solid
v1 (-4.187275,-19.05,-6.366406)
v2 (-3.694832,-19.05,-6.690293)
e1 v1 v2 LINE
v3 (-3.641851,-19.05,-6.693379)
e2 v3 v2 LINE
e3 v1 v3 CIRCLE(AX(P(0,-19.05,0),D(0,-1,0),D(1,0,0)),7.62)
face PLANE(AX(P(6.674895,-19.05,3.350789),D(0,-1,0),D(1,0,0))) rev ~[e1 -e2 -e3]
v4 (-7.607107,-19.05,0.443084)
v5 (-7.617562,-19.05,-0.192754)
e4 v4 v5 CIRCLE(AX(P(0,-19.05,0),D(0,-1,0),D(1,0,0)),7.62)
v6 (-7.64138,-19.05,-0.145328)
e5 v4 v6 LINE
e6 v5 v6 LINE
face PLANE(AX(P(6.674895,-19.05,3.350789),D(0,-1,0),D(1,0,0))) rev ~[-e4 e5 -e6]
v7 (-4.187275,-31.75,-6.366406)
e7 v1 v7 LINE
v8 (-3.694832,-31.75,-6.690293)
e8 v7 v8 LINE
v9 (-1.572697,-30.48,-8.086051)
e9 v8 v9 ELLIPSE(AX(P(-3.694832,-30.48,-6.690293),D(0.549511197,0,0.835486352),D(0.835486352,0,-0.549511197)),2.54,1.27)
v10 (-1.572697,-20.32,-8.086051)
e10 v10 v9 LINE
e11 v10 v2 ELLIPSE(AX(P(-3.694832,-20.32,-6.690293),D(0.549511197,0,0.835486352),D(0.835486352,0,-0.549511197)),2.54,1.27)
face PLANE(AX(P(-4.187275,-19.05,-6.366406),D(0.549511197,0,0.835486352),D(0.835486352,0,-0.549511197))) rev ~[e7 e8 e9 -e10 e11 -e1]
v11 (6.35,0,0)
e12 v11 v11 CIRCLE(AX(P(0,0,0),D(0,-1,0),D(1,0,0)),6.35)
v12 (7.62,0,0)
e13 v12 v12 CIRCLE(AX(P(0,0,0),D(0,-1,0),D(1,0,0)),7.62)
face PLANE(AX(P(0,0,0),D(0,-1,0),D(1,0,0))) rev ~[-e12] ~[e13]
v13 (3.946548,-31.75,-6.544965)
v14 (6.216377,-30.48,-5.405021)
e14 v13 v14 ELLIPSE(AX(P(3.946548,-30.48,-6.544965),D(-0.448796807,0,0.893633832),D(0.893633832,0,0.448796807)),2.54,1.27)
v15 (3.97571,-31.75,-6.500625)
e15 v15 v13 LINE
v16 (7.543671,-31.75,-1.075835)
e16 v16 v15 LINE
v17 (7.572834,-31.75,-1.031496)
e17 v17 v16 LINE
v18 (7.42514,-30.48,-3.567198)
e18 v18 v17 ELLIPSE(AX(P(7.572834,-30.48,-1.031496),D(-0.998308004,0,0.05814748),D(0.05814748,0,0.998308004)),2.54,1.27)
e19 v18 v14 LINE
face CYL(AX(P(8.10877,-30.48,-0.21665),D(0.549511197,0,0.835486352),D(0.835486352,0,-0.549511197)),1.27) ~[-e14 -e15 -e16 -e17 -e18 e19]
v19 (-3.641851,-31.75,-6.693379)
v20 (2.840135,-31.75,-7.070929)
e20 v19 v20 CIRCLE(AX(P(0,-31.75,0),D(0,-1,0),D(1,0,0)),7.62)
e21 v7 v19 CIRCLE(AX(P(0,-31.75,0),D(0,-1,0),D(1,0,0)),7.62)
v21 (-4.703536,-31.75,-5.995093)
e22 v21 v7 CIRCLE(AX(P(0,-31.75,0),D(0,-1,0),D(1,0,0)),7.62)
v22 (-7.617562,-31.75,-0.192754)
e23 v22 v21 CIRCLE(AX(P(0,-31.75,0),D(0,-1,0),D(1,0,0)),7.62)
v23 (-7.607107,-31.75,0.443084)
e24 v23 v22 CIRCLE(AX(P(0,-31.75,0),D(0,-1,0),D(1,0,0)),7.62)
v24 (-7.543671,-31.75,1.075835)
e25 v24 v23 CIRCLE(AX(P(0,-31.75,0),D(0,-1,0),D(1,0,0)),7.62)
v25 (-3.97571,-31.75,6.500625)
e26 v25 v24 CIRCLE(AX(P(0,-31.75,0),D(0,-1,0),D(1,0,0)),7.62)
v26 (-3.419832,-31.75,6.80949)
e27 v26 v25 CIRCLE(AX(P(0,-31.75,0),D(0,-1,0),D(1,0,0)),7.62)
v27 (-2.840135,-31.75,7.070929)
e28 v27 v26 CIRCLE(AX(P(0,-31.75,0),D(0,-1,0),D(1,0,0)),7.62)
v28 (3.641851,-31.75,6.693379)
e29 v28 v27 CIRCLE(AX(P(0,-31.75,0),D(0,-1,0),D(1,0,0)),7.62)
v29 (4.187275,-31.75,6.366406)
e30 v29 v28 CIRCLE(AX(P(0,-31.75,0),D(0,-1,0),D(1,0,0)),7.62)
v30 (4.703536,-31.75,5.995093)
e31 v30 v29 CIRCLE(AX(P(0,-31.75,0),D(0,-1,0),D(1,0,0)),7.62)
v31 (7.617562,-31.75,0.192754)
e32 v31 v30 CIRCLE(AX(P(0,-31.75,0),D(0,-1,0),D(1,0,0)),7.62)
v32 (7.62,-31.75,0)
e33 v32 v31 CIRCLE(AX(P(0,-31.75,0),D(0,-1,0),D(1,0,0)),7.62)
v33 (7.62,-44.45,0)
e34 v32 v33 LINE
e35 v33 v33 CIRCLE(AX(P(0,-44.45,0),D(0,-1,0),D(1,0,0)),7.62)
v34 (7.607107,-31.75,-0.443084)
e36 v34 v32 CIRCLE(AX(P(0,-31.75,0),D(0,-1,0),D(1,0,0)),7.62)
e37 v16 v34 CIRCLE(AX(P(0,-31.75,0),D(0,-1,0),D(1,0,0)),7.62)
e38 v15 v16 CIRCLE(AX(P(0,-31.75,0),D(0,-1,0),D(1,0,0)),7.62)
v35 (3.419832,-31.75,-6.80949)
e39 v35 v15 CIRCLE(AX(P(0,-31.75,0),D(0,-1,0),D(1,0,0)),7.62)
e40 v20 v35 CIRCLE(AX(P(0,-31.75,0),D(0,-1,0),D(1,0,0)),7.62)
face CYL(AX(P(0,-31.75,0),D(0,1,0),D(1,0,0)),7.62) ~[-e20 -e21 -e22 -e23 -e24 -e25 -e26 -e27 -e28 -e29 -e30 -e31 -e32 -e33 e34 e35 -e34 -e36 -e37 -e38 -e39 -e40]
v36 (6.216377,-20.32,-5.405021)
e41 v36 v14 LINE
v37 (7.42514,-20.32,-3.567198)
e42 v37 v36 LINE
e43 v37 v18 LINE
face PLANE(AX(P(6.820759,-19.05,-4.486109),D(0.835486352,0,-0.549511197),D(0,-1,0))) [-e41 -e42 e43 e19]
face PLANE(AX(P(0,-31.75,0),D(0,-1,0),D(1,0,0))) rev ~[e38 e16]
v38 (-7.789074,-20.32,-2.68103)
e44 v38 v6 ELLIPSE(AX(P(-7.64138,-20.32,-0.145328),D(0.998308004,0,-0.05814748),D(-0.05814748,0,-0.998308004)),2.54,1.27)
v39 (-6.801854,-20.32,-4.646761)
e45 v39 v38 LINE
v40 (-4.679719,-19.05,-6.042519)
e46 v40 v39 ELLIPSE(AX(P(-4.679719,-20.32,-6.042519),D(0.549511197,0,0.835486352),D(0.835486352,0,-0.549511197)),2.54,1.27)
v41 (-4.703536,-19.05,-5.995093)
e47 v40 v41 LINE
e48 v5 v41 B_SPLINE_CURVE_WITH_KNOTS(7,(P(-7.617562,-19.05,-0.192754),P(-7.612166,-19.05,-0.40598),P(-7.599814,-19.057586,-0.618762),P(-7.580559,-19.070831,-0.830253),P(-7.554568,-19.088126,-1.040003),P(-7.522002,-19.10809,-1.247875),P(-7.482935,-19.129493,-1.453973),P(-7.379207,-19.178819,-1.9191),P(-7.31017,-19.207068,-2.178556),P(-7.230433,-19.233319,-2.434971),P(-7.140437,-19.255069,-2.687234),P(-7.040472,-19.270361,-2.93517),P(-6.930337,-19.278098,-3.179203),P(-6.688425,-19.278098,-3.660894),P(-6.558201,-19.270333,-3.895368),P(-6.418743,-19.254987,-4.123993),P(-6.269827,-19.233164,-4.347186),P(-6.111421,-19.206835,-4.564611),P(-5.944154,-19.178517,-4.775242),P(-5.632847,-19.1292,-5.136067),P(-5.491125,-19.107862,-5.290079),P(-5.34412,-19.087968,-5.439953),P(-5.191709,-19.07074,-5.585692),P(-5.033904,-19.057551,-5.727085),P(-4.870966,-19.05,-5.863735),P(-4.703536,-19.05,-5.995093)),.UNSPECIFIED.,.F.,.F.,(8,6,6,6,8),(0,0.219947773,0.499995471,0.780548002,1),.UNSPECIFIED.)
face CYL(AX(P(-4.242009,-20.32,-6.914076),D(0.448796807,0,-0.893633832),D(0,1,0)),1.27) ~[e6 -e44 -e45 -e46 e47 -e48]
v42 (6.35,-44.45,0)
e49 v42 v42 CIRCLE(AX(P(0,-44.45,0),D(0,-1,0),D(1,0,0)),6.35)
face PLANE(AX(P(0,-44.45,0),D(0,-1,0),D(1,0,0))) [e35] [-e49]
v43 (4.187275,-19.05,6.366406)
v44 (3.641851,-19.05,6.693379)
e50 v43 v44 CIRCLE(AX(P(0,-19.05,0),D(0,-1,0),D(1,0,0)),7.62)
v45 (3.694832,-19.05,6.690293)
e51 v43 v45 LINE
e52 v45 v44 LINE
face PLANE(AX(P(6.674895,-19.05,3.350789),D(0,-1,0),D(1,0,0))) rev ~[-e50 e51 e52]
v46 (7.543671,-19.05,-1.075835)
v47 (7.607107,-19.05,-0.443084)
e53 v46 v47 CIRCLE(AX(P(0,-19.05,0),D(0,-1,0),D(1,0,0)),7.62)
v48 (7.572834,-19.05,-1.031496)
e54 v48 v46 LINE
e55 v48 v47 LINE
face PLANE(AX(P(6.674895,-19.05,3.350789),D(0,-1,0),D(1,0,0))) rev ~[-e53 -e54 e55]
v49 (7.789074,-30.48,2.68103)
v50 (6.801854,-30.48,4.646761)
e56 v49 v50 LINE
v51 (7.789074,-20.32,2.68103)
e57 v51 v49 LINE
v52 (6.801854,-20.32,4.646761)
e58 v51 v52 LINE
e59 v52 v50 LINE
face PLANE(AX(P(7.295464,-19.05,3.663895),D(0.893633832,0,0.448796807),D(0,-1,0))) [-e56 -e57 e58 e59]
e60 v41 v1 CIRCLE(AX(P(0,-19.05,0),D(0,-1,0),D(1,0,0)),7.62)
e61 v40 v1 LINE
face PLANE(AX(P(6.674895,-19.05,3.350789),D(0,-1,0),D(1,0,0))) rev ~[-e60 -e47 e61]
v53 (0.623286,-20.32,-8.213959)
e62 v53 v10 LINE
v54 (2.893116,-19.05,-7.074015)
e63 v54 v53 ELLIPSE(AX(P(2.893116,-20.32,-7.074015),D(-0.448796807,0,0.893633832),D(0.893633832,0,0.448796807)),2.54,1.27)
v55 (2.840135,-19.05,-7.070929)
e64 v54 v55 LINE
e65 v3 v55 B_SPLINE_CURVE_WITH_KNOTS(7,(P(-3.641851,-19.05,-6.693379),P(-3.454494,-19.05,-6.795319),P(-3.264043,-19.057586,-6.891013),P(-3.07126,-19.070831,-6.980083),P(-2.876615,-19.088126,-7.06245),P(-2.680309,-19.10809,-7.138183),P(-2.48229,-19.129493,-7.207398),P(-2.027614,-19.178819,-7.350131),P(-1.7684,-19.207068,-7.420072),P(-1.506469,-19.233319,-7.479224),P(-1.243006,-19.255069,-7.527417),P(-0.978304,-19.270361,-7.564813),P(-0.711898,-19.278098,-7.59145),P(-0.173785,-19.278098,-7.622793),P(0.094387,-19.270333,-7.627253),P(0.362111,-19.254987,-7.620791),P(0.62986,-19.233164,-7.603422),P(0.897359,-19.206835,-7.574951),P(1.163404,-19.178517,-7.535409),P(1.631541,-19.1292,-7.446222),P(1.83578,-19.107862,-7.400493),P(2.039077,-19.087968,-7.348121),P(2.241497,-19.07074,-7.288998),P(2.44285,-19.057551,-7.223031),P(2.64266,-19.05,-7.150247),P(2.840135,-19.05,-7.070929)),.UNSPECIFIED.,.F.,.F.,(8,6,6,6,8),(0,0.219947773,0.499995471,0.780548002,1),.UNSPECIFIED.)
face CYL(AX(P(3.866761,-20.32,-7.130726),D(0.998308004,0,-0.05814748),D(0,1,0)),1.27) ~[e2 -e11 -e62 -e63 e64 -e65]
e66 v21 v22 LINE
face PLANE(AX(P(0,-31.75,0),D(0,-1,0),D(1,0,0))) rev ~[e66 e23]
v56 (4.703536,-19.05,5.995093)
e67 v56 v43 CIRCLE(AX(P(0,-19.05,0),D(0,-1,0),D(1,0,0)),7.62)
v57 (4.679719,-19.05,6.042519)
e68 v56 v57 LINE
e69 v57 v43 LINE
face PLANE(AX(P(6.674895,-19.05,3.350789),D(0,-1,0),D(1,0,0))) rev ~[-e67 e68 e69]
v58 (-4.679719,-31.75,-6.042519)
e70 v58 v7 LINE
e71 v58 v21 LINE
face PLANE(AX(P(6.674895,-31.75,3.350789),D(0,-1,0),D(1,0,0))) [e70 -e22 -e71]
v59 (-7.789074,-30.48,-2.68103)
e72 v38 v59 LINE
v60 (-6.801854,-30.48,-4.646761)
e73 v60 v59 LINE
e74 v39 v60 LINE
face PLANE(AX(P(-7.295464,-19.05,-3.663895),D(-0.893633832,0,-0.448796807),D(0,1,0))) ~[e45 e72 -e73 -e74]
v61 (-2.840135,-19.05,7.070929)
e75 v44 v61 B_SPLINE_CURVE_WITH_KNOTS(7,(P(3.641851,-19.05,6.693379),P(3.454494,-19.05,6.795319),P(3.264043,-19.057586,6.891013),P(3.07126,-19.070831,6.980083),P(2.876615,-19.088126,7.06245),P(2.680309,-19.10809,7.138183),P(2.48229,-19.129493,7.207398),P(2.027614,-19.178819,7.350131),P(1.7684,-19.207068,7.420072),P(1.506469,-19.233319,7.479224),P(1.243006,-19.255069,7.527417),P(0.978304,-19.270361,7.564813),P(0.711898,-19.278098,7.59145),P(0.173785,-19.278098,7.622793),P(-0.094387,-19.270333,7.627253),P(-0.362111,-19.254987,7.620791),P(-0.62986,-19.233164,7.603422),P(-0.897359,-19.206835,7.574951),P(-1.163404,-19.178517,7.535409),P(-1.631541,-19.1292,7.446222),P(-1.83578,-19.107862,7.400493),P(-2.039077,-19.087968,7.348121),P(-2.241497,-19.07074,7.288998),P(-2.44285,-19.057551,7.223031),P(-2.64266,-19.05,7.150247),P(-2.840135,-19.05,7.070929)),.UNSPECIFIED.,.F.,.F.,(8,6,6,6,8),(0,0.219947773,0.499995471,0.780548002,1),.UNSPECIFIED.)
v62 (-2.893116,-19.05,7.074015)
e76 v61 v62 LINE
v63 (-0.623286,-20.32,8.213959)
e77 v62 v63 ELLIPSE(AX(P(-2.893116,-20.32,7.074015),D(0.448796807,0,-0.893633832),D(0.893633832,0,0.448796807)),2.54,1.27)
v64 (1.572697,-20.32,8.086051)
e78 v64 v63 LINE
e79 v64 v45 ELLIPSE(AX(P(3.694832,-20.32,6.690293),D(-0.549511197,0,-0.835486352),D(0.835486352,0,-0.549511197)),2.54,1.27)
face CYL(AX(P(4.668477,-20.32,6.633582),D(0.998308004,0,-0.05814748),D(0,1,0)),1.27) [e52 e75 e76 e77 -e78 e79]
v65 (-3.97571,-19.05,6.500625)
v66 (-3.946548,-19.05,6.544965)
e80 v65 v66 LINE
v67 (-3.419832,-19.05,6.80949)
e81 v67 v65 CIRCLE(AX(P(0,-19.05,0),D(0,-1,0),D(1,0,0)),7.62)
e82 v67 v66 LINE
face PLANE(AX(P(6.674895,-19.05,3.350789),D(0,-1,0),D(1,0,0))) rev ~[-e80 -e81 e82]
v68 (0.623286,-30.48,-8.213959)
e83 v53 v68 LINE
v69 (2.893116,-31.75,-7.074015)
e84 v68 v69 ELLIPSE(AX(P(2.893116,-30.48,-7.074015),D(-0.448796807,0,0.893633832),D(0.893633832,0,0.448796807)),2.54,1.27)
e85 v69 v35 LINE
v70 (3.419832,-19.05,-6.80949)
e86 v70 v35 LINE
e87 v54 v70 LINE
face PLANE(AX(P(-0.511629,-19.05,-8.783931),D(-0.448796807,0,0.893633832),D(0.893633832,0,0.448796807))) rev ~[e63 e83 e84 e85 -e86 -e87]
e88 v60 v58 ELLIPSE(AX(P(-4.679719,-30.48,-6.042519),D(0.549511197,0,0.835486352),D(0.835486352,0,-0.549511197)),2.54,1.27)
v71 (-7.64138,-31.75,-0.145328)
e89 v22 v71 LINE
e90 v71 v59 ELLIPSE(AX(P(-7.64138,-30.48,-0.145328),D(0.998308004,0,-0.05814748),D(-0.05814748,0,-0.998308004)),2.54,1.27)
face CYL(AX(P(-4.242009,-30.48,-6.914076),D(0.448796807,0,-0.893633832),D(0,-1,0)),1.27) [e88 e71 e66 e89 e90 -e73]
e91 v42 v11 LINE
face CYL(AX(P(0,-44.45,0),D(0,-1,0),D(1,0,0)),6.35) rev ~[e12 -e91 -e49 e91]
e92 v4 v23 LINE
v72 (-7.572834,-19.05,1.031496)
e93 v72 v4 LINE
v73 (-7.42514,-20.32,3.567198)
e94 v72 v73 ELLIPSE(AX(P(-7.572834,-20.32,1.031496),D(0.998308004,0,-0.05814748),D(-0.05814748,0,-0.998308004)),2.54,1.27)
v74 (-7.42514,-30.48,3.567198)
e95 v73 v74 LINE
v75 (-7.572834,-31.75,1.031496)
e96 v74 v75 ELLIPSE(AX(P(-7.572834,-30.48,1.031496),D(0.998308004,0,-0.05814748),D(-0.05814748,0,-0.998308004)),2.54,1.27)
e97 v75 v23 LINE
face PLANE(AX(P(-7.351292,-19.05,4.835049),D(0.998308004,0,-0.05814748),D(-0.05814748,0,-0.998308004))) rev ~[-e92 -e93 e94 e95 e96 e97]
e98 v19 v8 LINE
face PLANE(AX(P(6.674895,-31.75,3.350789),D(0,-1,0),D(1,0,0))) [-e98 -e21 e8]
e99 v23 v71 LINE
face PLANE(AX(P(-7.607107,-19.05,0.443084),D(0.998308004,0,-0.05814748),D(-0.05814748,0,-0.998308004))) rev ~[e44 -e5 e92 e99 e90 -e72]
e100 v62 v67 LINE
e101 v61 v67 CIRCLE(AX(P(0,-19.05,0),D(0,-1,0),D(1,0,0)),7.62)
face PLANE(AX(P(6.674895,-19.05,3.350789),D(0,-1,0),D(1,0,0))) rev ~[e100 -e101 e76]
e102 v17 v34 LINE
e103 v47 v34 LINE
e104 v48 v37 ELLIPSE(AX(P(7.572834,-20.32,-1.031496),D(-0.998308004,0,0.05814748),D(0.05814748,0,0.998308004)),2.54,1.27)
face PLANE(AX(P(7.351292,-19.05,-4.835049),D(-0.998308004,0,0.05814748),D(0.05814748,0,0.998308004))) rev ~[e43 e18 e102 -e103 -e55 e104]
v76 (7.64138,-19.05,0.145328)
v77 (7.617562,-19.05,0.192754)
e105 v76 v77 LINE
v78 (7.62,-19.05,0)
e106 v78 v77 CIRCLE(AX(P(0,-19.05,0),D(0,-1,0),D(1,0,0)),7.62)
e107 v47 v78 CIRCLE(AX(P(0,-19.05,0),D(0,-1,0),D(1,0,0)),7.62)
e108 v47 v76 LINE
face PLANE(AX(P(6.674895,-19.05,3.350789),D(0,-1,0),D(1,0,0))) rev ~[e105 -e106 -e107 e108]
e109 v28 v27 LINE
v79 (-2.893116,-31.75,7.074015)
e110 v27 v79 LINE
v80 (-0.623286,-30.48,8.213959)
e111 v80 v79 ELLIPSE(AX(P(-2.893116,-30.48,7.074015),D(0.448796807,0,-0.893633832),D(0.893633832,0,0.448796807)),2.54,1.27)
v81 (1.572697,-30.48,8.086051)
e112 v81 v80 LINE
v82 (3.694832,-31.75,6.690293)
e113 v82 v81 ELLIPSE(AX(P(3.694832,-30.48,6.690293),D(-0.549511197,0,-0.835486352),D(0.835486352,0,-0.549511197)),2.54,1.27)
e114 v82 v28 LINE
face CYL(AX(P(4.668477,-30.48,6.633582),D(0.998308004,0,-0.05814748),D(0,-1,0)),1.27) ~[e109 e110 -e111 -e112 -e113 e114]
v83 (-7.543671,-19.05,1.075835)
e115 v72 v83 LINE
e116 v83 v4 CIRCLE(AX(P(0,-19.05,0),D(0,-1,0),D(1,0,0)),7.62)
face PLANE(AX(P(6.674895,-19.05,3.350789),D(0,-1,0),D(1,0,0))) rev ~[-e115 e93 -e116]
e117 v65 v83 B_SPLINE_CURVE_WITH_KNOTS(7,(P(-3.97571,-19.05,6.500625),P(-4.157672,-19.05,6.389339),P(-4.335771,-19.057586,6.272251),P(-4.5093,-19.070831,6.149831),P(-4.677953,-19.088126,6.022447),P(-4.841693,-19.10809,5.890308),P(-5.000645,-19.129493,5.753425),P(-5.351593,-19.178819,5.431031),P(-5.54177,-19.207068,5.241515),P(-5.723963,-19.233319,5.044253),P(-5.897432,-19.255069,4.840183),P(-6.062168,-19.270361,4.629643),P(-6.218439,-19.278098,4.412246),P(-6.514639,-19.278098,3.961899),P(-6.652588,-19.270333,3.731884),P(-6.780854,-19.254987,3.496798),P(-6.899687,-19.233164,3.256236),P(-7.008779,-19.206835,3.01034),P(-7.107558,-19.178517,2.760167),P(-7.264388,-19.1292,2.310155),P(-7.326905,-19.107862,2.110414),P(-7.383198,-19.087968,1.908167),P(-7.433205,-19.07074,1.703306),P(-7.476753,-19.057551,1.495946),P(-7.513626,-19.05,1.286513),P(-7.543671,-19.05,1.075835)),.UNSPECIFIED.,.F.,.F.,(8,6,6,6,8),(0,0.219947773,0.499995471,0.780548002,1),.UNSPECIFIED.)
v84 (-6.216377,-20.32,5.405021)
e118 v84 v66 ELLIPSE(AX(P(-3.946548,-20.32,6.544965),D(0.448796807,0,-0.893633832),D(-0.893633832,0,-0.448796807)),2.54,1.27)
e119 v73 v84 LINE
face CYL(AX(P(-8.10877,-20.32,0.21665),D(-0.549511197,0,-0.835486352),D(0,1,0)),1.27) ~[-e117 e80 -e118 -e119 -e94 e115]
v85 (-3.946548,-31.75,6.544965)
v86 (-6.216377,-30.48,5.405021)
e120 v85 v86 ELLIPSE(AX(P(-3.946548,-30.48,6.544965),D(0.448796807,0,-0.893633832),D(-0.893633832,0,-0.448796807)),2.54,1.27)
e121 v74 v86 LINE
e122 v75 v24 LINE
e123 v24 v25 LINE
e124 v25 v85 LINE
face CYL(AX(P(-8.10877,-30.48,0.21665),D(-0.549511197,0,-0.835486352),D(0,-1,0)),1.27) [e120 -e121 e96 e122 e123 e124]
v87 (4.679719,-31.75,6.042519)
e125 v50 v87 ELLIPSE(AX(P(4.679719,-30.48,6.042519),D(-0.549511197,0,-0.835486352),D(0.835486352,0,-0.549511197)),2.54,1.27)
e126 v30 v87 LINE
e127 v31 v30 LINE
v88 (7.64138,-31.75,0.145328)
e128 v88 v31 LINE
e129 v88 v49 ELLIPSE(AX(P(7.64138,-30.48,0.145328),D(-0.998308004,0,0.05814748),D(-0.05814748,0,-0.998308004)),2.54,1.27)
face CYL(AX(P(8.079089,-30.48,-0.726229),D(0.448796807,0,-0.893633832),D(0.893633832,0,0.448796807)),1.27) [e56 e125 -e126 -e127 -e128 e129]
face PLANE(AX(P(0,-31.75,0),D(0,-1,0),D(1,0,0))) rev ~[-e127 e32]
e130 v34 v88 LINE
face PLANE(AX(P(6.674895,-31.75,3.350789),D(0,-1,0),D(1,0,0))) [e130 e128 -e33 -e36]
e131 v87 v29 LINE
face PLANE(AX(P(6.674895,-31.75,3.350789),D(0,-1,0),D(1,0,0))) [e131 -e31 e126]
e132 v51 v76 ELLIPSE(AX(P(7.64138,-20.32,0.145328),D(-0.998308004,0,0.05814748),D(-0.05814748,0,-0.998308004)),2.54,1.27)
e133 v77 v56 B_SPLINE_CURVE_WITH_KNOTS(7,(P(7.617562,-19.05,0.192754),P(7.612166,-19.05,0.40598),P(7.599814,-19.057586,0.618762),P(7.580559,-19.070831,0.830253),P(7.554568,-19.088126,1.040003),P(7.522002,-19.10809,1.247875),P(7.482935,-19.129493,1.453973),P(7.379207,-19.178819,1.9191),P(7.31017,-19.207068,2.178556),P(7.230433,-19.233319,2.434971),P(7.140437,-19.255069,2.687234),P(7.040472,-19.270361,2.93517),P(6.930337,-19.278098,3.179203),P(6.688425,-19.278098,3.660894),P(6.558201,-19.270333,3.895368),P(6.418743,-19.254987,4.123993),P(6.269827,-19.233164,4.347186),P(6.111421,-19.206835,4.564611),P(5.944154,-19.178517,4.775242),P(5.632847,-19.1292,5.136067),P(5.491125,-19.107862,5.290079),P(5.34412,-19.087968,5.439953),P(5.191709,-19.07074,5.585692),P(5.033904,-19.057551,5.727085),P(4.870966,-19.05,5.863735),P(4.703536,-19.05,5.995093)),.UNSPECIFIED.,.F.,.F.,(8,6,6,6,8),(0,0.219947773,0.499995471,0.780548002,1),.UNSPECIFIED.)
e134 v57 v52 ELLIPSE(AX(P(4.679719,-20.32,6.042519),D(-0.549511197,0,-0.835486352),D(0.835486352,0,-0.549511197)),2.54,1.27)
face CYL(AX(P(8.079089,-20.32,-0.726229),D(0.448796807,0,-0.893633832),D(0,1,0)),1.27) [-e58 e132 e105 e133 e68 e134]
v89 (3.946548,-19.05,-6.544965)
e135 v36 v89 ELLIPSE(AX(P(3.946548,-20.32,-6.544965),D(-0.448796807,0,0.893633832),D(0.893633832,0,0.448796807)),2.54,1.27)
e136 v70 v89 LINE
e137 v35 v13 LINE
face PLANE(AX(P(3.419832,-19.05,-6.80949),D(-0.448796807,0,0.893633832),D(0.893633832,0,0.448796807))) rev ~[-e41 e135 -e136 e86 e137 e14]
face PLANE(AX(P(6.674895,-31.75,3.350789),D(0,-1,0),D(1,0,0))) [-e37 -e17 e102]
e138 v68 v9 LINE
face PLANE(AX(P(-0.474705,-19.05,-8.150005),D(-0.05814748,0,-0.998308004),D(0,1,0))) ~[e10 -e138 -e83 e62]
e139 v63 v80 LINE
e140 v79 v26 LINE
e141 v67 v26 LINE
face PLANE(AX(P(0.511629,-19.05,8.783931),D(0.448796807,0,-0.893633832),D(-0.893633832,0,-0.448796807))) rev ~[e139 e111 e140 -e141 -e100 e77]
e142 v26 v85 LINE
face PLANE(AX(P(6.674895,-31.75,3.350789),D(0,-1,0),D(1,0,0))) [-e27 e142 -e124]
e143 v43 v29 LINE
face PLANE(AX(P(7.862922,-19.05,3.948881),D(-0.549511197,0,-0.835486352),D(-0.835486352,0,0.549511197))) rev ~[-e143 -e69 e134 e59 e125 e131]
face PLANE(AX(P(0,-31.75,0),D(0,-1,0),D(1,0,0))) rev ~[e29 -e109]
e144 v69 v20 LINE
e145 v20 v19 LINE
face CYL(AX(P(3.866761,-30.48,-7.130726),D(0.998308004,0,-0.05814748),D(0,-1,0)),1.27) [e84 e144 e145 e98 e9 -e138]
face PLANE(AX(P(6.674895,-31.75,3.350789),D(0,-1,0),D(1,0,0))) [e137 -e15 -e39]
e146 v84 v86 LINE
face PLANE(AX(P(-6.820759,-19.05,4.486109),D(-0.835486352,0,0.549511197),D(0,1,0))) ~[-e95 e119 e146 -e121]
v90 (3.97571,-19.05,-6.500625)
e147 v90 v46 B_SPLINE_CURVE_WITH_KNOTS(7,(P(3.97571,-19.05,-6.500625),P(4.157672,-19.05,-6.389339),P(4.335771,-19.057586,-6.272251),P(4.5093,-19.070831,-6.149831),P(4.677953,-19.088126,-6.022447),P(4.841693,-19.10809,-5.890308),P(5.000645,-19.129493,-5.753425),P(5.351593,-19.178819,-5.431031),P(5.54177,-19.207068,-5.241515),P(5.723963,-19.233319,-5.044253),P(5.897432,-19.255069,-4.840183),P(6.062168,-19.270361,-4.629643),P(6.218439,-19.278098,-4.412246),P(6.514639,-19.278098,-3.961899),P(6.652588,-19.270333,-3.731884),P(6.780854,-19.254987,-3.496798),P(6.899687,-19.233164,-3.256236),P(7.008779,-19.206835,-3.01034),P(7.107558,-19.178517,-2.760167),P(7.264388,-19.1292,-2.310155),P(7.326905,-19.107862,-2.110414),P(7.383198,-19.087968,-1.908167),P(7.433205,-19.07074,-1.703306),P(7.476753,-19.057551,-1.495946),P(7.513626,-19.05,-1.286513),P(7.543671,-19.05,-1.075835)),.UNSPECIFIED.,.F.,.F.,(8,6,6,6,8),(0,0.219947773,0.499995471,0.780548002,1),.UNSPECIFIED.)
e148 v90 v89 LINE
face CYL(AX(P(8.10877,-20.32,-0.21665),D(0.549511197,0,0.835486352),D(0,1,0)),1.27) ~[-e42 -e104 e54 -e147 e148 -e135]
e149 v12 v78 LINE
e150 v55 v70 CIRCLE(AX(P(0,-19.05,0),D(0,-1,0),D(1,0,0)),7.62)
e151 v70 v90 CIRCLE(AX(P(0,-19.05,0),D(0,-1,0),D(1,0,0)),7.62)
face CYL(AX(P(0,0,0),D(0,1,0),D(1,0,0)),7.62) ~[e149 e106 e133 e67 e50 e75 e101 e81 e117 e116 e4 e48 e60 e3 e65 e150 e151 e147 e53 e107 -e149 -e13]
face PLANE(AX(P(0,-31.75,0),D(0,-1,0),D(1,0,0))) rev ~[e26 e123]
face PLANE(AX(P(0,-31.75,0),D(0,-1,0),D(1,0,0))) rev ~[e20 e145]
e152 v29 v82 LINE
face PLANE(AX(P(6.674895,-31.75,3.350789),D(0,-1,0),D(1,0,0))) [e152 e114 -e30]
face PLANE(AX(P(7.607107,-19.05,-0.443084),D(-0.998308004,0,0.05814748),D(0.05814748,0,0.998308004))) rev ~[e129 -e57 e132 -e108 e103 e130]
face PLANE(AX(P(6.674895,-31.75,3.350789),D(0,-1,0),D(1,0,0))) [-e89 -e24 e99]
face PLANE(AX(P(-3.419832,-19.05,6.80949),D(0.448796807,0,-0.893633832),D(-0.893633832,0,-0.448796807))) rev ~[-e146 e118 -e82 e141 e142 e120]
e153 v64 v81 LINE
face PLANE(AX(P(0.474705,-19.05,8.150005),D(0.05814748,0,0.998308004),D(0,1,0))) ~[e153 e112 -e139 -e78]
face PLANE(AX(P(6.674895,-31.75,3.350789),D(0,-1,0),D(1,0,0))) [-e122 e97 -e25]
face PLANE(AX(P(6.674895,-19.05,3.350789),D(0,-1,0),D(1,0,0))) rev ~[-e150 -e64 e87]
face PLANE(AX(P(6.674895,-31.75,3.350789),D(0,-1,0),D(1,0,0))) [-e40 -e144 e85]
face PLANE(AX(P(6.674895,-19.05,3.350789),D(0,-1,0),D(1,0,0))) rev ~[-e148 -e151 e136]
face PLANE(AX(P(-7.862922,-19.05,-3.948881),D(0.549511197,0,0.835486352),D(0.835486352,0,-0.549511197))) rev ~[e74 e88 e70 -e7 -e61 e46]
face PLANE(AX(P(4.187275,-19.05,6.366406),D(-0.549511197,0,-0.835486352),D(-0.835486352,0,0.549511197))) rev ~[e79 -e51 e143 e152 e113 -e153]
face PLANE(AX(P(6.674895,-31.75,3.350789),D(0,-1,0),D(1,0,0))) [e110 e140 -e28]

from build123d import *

# Parameters (mm, degrees)
F0_R         = 7.62
F1_DEPTH     = 19.05
F3_DEPTH     = 12.7
F4_SIZE      = 1.27
F5_T1_DEPTH  = 8.5497045256
F5_T3_DEPTH  = 8.5497045256
F5_T5_DEPTH  = 8.5497045256
F5_T7_DEPTH  = 8.5497045256
F5_T12_DEPTH = 8.5497045256
F5_S13_R     = 7.62
F5_T14_DEPTH = 6
F5_T18_DEPTH = 8.5497045256
F5_S19_R     = 7.62
F5_T20_DEPTH = 6
F5_T24_DEPTH = 8.5497045256
F5_S25_R     = 7.62
F5_T26_DEPTH = 6
F5_T30_DEPTH = 8.5497045256
F5_S31_R     = 7.62
F5_T32_DEPTH = 6
F5_T36_DEPTH = 8.5497045256
F5_S37_R     = 7.62
F5_T38_DEPTH = 6
F5_T42_DEPTH = 8.5497045256
F5_S43_R     = 7.62
F5_T44_DEPTH = 6
F6_R         = 7.62
F7_DEPTH     = 12.7
F8_R         = 6.35
F9_DEPTH     = 44.4510001


# Not quite as in the source:
# - a fillet or chamfer that OpenCascade refuses, or shapes differently, is made with other operations: its cross-section is extruded or revolved along the edge and cut away or added


with BuildPart() as f1:
    # F0 (on Front) → F1 (new body)
    with BuildSketch(Plane.XZ):
        Circle(F0_R)
    extrude(amount=F1_DEPTH)

    # F2 (on face) → F3 (join)
    with BuildSketch(Plane.XZ.offset(19.05)):
        with BuildLine():
            Line((7.8629215405, 3.9488814679), (4.1872753391, 6.3664059904))
            ThreePointArc((4.1872753391, 6.3664059904), (6.7071394083, 3.6164459015), (7.62, 0))
            ThreePointArc((7.62, 0), (7.616776064, -0.2216357159), (7.6071069841, -0.4430838887))
            Line((7.6071069841, -0.4430838887), (7.8629215405, 3.9488814679))
        make_face()
        with BuildLine():
            ThreePointArc((4.1872753391, 6.3664059904), (0.4430838236, 7.6071069879), (-3.4198316443, 6.8094898138))
            ThreePointArc((-3.4198316443, 6.8094898138), (-6.3664059346, 4.187275424), (-7.6071069765, 0.4430840189))
            ThreePointArc((-7.6071069765, 0.4430840189), (-6.8094898664, -3.4198315396), (-4.187275378, -6.3664059648))
            ThreePointArc((-4.187275378, -6.3664059648), (-0.4430838337, -7.6071069873), (3.419831668, -6.8094898019))
            ThreePointArc((3.419831668, -6.8094898019), (6.3664059777, -4.1872753585), (7.6071069841, -0.4430838887))
            ThreePointArc((7.6071069841, -0.4430838887), (7.616776064, -0.2216357159), (7.62, 0))
            ThreePointArc((7.62, 0), (6.7071394083, 3.6164459015), (4.1872753391, 6.3664059904))
        make_face()
        with BuildLine():
            ThreePointArc((7.6071069841, -0.4430838887), (6.3664059777, -4.1872753585), (3.419831668, -6.8094898019))
            Line((3.419831668, -6.8094898019), (7.351292438, -4.8350490681))
            Line((7.351292438, -4.8350490681), (7.6071069841, -0.4430838887))
        make_face()
        with BuildLine():
            ThreePointArc((3.419831668, -6.8094898019), (-0.4430838337, -7.6071069873), (-4.187275378, -6.3664059648))
            Line((-4.187275378, -6.3664059648), (-0.5116291025, -8.783930536))
            Line((-0.5116291025, -8.783930536), (3.419831668, -6.8094898019))
        make_face()
        with BuildLine():
            ThreePointArc((-4.187275378, -6.3664059648), (-6.8094898664, -3.4198315396), (-7.6071069765, 0.4430840189))
            Line((-7.6071069765, 0.4430840189), (-7.8629215405, -3.9488814679))
            Line((-7.8629215405, -3.9488814679), (-4.187275378, -6.3664059648))
        make_face()
        with BuildLine():
            Line((-3.4198316443, 6.8094898138), (-7.351292438, 4.8350490681))
            Line((-7.351292438, 4.8350490681), (-7.6071069765, 0.4430840189))
            ThreePointArc((-7.6071069765, 0.4430840189), (-6.3664059346, 4.187275424), (-3.4198316443, 6.8094898138))
        make_face()
        with BuildLine():
            Line((0.5116291025, 8.783930536), (-3.4198316443, 6.8094898138))
            ThreePointArc((-3.4198316443, 6.8094898138), (0.4430838236, 7.6071069879), (4.1872753391, 6.3664059904))
            Line((4.1872753391, 6.3664059904), (0.5116291025, 8.783930536))
        make_face()
    extrude(amount=F3_DEPTH)

    # F4
    f4_edges = [f1.edges().sort_by_distance(p)[0] for p in [
        (7.862922, -25.4, 3.948881),
        (7.351292, -25.4, -4.835049),
        (-0.511629, -25.4, -8.783931),
        (-7.862922, -25.4, -3.948881),
        (-7.351292, -25.4, 4.835049),
        (0.511629, -25.4, 8.783931),
    ]]
    chamfer(f4_edges, length=F4_SIZE)

    # F5: fillet of radius 1.27 on 12 edges, made by hand

    # F5_s2 → F5_t1 (cut)
    with BuildSketch(Plane(origin=(1.918540045, 0, -3.8201526101), x_dir=(0, 1, 0), z_dir=(-0.4487968068, 0, 0.8936338323))):
        with BuildLine():
            ThreePointArc((-30.48, -8.1638181024), (-31.3780256121, -7.7918437146), (-31.75, -6.8938181024))
            Line((-31.75, -6.8938181024), (-31.75, -8.1638181024))
            Line((-31.75, -8.1638181024), (-30.48, -8.1638181024))
        make_face()
        with BuildLine():
            ThreePointArc((-31.75, 6.8938181024), (-31.3780256121, 7.7918437146), (-30.48, 8.1638181024))
            Line((-30.48, 8.1638181024), (-31.75, 8.1638181024))
            Line((-31.75, 8.1638181024), (-31.75, 6.8938181024))
        make_face()
    extrude(amount=F5_T1_DEPTH, mode=Mode.SUBTRACT)

    # F5_s4 → F5_t3 (cut)
    with BuildSketch(Plane(origin=(4.2676192292, 0, -0.2485718879), x_dir=(0, 1, 0), z_dir=(-0.9983080038, 0, 0.0581474803))):
        with BuildLine():
            ThreePointArc((-31.75, -6.8938181024), (-31.3780256121, -7.7918437146), (-30.48, -8.1638181024))
            Line((-30.48, -8.1638181024), (-31.75, -8.1638181024))
            Line((-31.75, -8.1638181024), (-31.75, -6.8938181024))
        make_face()
        with BuildLine():
            ThreePointArc((-31.75, 6.8938181024), (-31.3780256121, 7.7918437146), (-30.48, 8.1638181024))
            Line((-30.48, 8.1638181024), (-31.75, 8.1638181024))
            Line((-31.75, 8.1638181024), (-31.75, 6.8938181024))
        make_face()
    extrude(amount=F5_T3_DEPTH, mode=Mode.SUBTRACT)

    # F5_s6 → F5_t5 (cut)
    with BuildSketch(Plane(origin=(-2.3490791841, 0, -3.5715807222), x_dir=(0, 1, 0), z_dir=(0.5495111971, 0, 0.835486352))):
        with BuildLine():
            ThreePointArc((-31.75, 6.8938181024), (-31.3780256121, 7.7918437146), (-30.48, 8.1638181024))
            Line((-30.48, 8.1638181024), (-31.75, 8.1638181024))
            Line((-31.75, 8.1638181024), (-31.75, 6.8938181024))
        make_face()
    extrude(amount=F5_T5_DEPTH, mode=Mode.SUBTRACT)

    # F5_s8 → F5_t7 (cut)
    with BuildSketch(Plane(origin=(2.3490791841, 0, 3.5715807222), x_dir=(0, 1, 0), z_dir=(-0.5495111971, 0, -0.835486352))):
        with BuildLine():
            ThreePointArc((-30.48, 8.1638181024), (-31.3780256121, 7.7918437146), (-31.75, 6.8938181024))
            Line((-31.75, 6.8938181024), (-31.75, 8.1638181024))
            Line((-31.75, 8.1638181024), (-30.48, 8.1638181024))
        make_face()
    extrude(amount=F5_T7_DEPTH, mode=Mode.SUBTRACT)


with BuildPart() as f5_tool10:
    # F5_s11 → F5_t12 (new body)
    with BuildSketch(Plane(origin=(4.2676192292, 0, -0.2485718879), x_dir=(0, 1, 0), z_dir=(-0.9983080038, 0, 0.0581474803))):
        with BuildLine():
            ThreePointArc((-19.05, -6.8938181024), (-19.4219743879, -7.7918437146), (-20.32, -8.1638181024))
            Line((-20.32, -8.1638181024), (-19.05, -8.1638181024))
            Line((-19.05, -8.1638181024), (-19.05, -6.8938181024))
        make_face()
    extrude(amount=F5_T12_DEPTH)

    # F5_s13 → F5_t14 (cut, symmetric)
    with BuildSketch(Plane.XZ.offset(19.7)):
        Circle(F5_S13_R)
    extrude(amount=F5_T14_DEPTH, both=True, mode=Mode.SUBTRACT)


with BuildPart() as f1_1:
    add(f1.part)

    # F5_t9: cut F5_tool10
    add(f5_tool10.part, mode=Mode.SUBTRACT)


with BuildPart() as f5_tool16:
    # F5_s17 → F5_t18 (new body)
    with BuildSketch(Plane(origin=(-2.3490791841, 0, -3.5715807222), x_dir=(0, 1, 0), z_dir=(0.5495111971, 0, 0.835486352))):
        with BuildLine():
            ThreePointArc((-19.05, 6.8938181024), (-19.4219743879, 7.7918437146), (-20.32, 8.1638181024))
            Line((-20.32, 8.1638181024), (-19.05, 8.1638181024))
            Line((-19.05, 8.1638181024), (-19.05, 6.8938181024))
        make_face()
    extrude(amount=F5_T18_DEPTH)

    # F5_s19 → F5_t20 (cut, symmetric)
    with BuildSketch(Plane.XZ.offset(19.7)):
        Circle(F5_S19_R)
    extrude(amount=F5_T20_DEPTH, both=True, mode=Mode.SUBTRACT)


with BuildPart() as f1_2:
    add(f1_1.part)

    # F5_t15: cut F5_tool16
    add(f5_tool16.part, mode=Mode.SUBTRACT)


with BuildPart() as f5_tool22:
    # F5_s23 → F5_t24 (new body)
    with BuildSketch(Plane(origin=(1.918540045, 0, -3.8201526101), x_dir=(0, 1, 0), z_dir=(-0.4487968068, 0, 0.8936338323))):
        with BuildLine():
            ThreePointArc((-19.05, 6.8938181024), (-19.4219743879, 7.7918437146), (-20.32, 8.1638181024))
            Line((-20.32, 8.1638181024), (-19.05, 8.1638181024))
            Line((-19.05, 8.1638181024), (-19.05, 6.8938181024))
        make_face()
    extrude(amount=F5_T24_DEPTH)

    # F5_s25 → F5_t26 (cut, symmetric)
    with BuildSketch(Plane.XZ.offset(19.7)):
        Circle(F5_S25_R)
    extrude(amount=F5_T26_DEPTH, both=True, mode=Mode.SUBTRACT)


with BuildPart() as f1_3:
    add(f1_2.part)

    # F5_t21: cut F5_tool22
    add(f5_tool22.part, mode=Mode.SUBTRACT)


with BuildPart() as f5_tool28:
    # F5_s29 → F5_t30 (new body)
    with BuildSketch(Plane(origin=(4.2676192292, 0, -0.2485718879), x_dir=(0, 1, 0), z_dir=(-0.9983080038, 0, 0.0581474803))):
        with BuildLine():
            ThreePointArc((-19.05, 6.8938181024), (-19.4219743879, 7.7918437146), (-20.32, 8.1638181024))
            Line((-20.32, 8.1638181024), (-19.05, 8.1638181024))
            Line((-19.05, 8.1638181024), (-19.05, 6.8938181024))
        make_face()
    extrude(amount=F5_T30_DEPTH)

    # F5_s31 → F5_t32 (cut, symmetric)
    with BuildSketch(Plane.XZ.offset(19.7)):
        Circle(F5_S31_R)
    extrude(amount=F5_T32_DEPTH, both=True, mode=Mode.SUBTRACT)


with BuildPart() as f1_4:
    add(f1_3.part)

    # F5_t27: cut F5_tool28
    add(f5_tool28.part, mode=Mode.SUBTRACT)


with BuildPart() as f5_tool34:
    # F5_s35 → F5_t36 (new body)
    with BuildSketch(Plane(origin=(2.3490791841, 0, 3.5715807222), x_dir=(0, 1, 0), z_dir=(-0.5495111971, 0, -0.835486352))):
        with BuildLine():
            ThreePointArc((-19.05, 6.8938181024), (-19.4219743879, 7.7918437146), (-20.32, 8.1638181024))
            Line((-20.32, 8.1638181024), (-19.05, 8.1638181024))
            Line((-19.05, 8.1638181024), (-19.05, 6.8938181024))
        make_face()
    extrude(amount=F5_T36_DEPTH)

    # F5_s37 → F5_t38 (cut, symmetric)
    with BuildSketch(Plane.XZ.offset(19.7)):
        Circle(F5_S37_R)
    extrude(amount=F5_T38_DEPTH, both=True, mode=Mode.SUBTRACT)


with BuildPart() as f1_5:
    add(f1_4.part)

    # F5_t33: cut F5_tool34
    add(f5_tool34.part, mode=Mode.SUBTRACT)


with BuildPart() as f5_tool40:
    # F5_s41 → F5_t42 (new body)
    with BuildSketch(Plane(origin=(1.918540045, 0, -3.8201526101), x_dir=(0, 1, 0), z_dir=(-0.4487968068, 0, 0.8936338323))):
        with BuildLine():
            ThreePointArc((-19.05, -6.8938181024), (-19.4219743879, -7.7918437146), (-20.32, -8.1638181024))
            Line((-20.32, -8.1638181024), (-19.05, -8.1638181024))
            Line((-19.05, -8.1638181024), (-19.05, -6.8938181024))
        make_face()
    extrude(amount=F5_T42_DEPTH)

    # F5_s43 → F5_t44 (cut, symmetric)
    with BuildSketch(Plane.XZ.offset(19.7)):
        Circle(F5_S43_R)
    extrude(amount=F5_T44_DEPTH, both=True, mode=Mode.SUBTRACT)


with BuildPart() as f1_6:
    add(f1_5.part)

    # F5_t39: cut F5_tool40
    add(f5_tool40.part, mode=Mode.SUBTRACT)

    # F6 (on face) → F7 (join)
    with BuildSketch(Plane.XZ.offset(31.75)):
        Circle(F6_R)
    extrude(amount=F7_DEPTH)

    # F8 (on face) → F9 (cut, through all)
    with BuildSketch(Plane.XZ.offset(44.45)):
        Circle(F8_R)
    extrude(amount=-F9_DEPTH, mode=Mode.SUBTRACT)


solid = f1_6.part
